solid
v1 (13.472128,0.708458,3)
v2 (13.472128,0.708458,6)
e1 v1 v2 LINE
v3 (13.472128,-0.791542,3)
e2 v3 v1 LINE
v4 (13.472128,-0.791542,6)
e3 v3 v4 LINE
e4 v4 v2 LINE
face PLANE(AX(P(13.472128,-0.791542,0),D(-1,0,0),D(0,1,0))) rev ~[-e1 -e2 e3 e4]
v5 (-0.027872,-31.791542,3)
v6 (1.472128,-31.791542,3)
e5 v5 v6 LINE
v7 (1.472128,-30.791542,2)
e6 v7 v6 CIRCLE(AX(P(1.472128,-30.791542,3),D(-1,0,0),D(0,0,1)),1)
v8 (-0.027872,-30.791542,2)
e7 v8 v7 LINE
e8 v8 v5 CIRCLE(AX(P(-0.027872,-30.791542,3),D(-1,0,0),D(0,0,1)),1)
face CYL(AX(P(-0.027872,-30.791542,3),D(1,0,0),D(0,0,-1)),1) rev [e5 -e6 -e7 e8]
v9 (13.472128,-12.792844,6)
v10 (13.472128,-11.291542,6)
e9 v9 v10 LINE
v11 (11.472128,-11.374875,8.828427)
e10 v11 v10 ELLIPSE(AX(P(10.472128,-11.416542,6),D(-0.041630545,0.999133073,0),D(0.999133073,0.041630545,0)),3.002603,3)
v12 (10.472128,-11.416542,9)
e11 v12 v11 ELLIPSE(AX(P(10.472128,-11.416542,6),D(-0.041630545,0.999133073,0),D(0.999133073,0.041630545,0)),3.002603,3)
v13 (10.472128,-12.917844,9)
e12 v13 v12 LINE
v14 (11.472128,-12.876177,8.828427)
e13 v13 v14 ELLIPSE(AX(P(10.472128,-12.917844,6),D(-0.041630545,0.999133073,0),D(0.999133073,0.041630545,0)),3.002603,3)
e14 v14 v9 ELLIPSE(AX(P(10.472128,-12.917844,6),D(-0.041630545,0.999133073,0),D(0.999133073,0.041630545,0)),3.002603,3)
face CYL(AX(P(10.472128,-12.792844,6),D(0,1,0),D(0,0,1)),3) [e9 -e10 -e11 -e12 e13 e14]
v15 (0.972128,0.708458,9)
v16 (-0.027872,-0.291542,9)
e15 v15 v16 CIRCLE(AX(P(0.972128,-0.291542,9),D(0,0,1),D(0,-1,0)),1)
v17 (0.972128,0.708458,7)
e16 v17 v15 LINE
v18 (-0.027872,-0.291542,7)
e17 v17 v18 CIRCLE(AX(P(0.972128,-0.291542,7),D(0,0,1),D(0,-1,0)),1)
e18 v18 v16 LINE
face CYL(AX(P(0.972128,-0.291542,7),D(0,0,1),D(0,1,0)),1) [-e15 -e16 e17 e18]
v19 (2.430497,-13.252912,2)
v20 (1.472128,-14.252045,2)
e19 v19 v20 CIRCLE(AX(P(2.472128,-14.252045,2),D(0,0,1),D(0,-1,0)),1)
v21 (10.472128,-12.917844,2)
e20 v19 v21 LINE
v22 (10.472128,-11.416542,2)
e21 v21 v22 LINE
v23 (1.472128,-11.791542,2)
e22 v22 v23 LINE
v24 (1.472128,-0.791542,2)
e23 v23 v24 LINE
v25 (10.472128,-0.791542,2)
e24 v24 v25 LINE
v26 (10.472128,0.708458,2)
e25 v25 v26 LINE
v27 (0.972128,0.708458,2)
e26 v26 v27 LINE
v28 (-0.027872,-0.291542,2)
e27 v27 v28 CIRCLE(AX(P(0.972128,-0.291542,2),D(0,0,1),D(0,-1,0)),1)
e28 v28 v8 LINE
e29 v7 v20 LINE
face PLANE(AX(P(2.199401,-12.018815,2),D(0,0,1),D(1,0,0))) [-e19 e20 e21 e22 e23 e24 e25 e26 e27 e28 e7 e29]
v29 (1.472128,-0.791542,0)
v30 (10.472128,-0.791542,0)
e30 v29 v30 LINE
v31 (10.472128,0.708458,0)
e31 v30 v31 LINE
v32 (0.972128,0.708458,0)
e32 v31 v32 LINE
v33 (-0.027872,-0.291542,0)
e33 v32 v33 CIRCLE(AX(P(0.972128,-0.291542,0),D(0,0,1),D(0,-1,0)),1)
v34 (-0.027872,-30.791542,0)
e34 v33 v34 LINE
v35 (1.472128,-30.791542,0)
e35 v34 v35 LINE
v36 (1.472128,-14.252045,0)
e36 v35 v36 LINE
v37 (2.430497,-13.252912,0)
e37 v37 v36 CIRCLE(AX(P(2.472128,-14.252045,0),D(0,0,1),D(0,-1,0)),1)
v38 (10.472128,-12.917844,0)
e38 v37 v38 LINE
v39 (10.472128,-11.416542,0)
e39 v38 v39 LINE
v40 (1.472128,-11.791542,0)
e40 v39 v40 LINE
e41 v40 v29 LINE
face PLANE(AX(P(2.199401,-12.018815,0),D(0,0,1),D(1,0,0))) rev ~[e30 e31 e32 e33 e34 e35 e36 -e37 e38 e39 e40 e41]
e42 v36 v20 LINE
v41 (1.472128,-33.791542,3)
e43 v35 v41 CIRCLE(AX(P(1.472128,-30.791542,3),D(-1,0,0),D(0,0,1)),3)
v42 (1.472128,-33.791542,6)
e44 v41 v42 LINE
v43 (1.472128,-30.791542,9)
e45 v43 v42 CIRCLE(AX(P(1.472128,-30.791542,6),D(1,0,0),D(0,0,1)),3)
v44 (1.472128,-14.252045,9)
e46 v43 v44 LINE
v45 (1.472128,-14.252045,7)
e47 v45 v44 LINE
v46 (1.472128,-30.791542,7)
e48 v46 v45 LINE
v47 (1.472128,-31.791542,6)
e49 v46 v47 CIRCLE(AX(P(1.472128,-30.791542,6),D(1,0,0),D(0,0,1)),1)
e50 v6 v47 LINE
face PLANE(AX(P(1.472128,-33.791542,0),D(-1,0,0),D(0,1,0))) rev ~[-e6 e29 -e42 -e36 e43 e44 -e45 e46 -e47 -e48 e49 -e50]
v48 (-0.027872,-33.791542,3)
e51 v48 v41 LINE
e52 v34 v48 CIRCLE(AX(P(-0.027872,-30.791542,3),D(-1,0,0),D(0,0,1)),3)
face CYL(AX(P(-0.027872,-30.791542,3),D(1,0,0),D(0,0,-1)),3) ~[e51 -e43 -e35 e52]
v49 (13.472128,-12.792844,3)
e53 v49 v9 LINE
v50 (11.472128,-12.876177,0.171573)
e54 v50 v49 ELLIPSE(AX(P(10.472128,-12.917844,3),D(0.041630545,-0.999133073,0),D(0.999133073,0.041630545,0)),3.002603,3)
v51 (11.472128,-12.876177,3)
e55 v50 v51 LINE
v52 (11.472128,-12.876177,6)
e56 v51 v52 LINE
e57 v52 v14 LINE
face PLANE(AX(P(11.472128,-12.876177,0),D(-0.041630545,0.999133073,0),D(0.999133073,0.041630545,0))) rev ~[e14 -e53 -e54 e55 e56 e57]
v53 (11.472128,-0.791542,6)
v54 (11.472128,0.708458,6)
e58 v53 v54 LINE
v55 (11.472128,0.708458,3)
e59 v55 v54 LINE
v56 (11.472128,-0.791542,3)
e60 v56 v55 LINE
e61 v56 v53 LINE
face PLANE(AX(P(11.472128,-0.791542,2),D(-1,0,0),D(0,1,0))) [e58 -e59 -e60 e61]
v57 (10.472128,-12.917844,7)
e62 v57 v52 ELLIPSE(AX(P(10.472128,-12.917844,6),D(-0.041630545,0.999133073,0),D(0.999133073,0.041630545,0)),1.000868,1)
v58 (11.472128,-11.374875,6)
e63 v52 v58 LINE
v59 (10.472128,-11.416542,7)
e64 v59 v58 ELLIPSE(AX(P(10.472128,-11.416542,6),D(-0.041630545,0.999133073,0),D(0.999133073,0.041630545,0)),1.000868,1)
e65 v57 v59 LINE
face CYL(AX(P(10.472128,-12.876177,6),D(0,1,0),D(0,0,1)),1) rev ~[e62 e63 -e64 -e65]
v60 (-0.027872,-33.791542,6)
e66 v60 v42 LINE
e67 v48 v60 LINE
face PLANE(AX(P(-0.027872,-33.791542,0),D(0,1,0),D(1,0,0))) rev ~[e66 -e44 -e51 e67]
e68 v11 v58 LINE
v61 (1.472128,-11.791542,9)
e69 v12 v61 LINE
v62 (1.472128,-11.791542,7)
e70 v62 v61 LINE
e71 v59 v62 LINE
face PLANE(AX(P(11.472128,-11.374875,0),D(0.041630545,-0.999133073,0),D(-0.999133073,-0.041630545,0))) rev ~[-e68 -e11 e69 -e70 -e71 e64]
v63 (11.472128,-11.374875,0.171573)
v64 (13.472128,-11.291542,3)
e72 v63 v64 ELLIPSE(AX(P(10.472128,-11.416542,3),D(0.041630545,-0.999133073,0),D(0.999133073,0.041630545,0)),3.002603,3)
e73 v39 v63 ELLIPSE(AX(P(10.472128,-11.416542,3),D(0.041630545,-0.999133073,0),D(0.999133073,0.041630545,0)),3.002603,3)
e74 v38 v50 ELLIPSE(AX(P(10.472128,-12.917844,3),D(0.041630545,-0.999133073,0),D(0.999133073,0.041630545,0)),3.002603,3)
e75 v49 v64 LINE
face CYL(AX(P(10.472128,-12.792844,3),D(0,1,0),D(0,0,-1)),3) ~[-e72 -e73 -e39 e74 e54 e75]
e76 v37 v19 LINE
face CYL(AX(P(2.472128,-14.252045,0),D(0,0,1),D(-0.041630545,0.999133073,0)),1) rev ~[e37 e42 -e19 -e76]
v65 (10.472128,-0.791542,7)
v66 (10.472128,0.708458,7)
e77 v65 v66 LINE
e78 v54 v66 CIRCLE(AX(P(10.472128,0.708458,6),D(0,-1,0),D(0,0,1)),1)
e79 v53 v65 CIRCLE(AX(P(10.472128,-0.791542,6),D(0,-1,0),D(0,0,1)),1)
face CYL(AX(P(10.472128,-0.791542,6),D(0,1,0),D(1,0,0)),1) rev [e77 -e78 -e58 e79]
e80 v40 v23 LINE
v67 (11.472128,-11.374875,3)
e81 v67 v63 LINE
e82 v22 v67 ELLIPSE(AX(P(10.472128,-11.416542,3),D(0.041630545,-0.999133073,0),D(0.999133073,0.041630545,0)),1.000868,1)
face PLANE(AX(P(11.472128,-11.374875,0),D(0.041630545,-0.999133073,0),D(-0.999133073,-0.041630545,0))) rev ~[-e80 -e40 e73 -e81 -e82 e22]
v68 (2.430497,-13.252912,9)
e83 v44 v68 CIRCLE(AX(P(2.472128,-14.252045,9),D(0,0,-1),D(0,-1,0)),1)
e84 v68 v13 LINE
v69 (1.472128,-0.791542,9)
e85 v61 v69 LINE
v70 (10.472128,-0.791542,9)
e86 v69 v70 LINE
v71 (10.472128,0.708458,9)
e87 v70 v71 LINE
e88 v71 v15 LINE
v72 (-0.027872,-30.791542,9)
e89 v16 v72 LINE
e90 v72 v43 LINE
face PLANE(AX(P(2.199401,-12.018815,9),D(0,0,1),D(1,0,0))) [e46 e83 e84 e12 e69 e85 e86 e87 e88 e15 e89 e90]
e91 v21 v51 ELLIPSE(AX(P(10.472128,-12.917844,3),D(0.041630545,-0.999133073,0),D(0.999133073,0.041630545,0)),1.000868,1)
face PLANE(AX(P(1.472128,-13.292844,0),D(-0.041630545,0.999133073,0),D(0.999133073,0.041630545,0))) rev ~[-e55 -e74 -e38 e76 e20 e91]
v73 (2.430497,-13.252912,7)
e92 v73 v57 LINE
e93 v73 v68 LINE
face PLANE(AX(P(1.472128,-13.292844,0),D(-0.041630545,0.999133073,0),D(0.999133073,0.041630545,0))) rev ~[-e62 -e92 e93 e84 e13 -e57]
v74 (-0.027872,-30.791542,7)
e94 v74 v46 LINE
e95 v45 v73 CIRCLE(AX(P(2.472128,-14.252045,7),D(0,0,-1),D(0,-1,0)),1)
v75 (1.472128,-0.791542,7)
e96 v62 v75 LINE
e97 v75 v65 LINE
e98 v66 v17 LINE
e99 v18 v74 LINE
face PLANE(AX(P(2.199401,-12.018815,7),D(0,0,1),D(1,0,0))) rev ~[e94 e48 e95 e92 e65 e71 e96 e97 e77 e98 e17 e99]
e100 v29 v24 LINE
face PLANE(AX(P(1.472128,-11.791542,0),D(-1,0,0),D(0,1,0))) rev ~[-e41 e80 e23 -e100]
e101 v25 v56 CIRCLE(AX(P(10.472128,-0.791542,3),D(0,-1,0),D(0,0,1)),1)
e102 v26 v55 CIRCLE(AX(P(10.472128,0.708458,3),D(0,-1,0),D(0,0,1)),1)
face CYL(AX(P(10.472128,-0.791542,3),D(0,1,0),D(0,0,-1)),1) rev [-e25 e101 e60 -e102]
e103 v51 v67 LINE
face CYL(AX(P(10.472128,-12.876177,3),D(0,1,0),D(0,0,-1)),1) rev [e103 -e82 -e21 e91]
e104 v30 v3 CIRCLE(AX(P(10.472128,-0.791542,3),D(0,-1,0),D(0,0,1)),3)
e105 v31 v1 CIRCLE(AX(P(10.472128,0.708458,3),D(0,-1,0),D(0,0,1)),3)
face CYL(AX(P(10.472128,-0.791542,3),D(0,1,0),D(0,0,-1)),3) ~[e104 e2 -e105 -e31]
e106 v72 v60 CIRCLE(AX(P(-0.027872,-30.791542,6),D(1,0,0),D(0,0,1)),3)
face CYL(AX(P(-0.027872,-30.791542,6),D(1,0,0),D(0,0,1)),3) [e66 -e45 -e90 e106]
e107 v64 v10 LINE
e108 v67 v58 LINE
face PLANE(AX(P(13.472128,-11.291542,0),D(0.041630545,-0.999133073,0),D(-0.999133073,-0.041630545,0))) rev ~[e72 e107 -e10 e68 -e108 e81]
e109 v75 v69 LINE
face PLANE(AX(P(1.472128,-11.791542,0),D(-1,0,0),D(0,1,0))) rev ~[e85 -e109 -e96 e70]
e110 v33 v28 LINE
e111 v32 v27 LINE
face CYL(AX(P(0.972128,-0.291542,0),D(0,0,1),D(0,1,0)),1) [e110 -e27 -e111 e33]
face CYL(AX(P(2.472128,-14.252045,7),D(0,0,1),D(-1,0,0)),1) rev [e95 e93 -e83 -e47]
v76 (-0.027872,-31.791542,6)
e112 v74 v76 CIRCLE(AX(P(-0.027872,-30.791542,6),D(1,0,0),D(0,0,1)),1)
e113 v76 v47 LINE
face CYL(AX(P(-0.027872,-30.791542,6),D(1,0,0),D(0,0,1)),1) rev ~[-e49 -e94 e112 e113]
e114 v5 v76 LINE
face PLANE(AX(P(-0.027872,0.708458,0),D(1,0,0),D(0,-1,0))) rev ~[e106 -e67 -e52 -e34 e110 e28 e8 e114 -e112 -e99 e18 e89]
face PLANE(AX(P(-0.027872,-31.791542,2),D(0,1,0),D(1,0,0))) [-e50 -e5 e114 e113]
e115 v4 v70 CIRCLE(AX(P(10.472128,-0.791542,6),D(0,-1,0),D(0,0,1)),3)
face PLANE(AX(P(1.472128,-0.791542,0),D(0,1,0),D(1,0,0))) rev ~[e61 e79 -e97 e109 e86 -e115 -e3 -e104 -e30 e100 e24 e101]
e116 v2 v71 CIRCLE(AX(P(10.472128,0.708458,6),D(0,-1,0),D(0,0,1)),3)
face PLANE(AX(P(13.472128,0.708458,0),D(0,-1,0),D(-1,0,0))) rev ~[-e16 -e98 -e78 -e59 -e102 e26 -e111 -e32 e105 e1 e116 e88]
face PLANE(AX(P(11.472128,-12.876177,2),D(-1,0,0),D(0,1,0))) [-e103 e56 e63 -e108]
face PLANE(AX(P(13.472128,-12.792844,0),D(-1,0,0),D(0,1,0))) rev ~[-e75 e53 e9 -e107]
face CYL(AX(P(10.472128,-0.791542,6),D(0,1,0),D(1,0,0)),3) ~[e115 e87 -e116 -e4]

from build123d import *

# Parameters (mm, degrees)
F1_DEPTH      = 2.5
F1_DEPTH_BACK = 2.5
F2_SIZE2      = 1
F2_SIZE       = 2
F3_R          = 3
F4_START      = 4
F4_DEPTH      = 5
F5_R          = 5
F5_2_R        = 5
F6_R          = 2
F6_2_R        = 2
F7_W          = 2.5
F7_H          = 2.5
F8_ANGLE      = 90
F9_DEPTH      = 10
F11_DEPTH     = 8
F12_DEPTH     = 8
F15_START     = 2.5
F14_R         = 2.5
F15_DEPTH     = 1.5
F16_W         = 12
F16_H         = 2
F16_W_2       = 2
F16_H_2       = 20
F17_DEPTH     = 7
F18_T         = -1
F16_H_3       = 1.5
F16_W_3       = 1.5
F19_DEPTH     = 9
F20_START     = 2
F20_DEPTH     = 5
F21_R         = 3
F21_2_R       = 3
F22_T1_DEPTH  = 2
F22_T3_DEPTH  = 1
F22_T5_DEPTH  = 1
F22_T7_DEPTH  = 2
F22_T9_DEPTH  = 2
F22_T11_DEPTH = 11
F22_T13_DEPTH = 32
F22_S17_W     = 1.02
F22_S17_H     = 1.02
F22_T18_DEPTH = 1.02
F22_S23_W     = 1.02
F22_S23_H     = 1.02
F22_T24_DEPTH = 1.02
F22_T28_ANGLE = 233.2969892374
F22_T30_ANGLE = 233.2969892374
F22_T32_ANGLE = 233.2969892374
F22_T34_ANGLE = 233.2969892374
F22_T35_DEPTH = 9
F22_T37_DEPTH = 9
F22_T39_DEPTH = 17
F22_T42_ANGLE = 233.2969892374
F22_T44_ANGLE = 90
F22_T46_ANGLE = 233.2969892374
F22_T48_ANGLE = 90
F22_T50_ANGLE = 90
F22_T52_ANGLE = 233.2969892374
F22_T54_ANGLE = 233.2969892374
F22_T56_ANGLE = 90
F22_T58_ANGLE = 233.2969892374
F22_T60_ANGLE = 233.2969892374
F22_T62_ANGLE = 90
F22_T64_ANGLE = 233.2969892374
F22_T66_ANGLE = 90
F22_T68_ANGLE = 233.2969892374
F22_2_F1_R    = 1
F22_2_F2_R    = 1


# Not quite as in the source:
# - a fillet or chamfer that OpenCascade refuses, or shapes differently, is made with other operations: its cross-section is extruded or revolved along the edge and cut away or added
# - a feature names something its author has since deleted; it is built from what else it names


with BuildPart() as f1:
    # F0 (on Top) → F1 (new body, two sides)
    with BuildSketch(Plane.XY) as f1_sk:
        Polygon((-2.4175545031, 19.9997189244), (-63.6058346017, 10), (-71.3429901912, 55.5274909482), (-73.2526121256, 67.2124675644), (-87.2356820635, 67.2124675644), (-132.104240014, 0), (-120.0807613656, 0), (-81.7352983314, 57.4409632971), (-81.1490054203, 53.9442313206), (-72.104240014, 0), (-63.6058346017, 0), (-0.7575159774, 9.8419431859), (0.8509074882, 0), (10.9835668635, 0), (4.4465969461, 39.9997189244), (-5.6860624292, 39.9997189244), align=None)
    extrude(amount=F1_DEPTH)
    extrude(f1_sk.sketch, amount=-F1_DEPTH_BACK)

    # F2
    f2_edges = [f1.edges().sort_by_distance(p)[0] for p in [
        (-80.244147, 67.212468, 2.5),
    ]]
    f2_side = f1.faces().sort_by_distance((-80.244147, 67.212468, 0))[0]
    chamfer(f2_edges, length=F2_SIZE, length2=F2_SIZE2, reference=f2_side)

    # F3
    f3_edges = [f1.edges().sort_by_distance(p)[0] for p in [
        (-80.496216, 66.212468, 2.5),
    ]]
    fillet(f3_edges, radius=F3_R)

    # F5
    f5_edges = [f1.edges().sort_by_distance(p)[0] for p in [
        (-81.735298, 57.440963, 0),
        (-72.10424, 0, 0),
        (-120.080761, 0, 0),
        (0.850907, 0, 0),
        (-87.235682, 67.212468, -1),
        (-73.252612, 67.212468, -1),
        (4.446597, 39.999719, 0),
    ]]
    fillet(f5_edges, radius=F5_R)

    # F6
    f6_edges = [f1.edges().sort_by_distance(p)[0] for p in [
        (-2.417555, 19.999719, 0),
        (-63.605835, 10, 0),
        (-0.757516, 9.841943, 0),
        (-5.686062, 39.999719, 0),
        (10.983567, 0, 0),
        (-132.10424, 0, 0),
    ]]
    fillet(f6_edges, radius=F6_R)

    # F7 (on Top) → F8 (revolve, cut)
    with BuildSketch(Plane.XY):
        Polygon((-82.9107738397, 68.988720722), (-82.9107738397, 65.988720722), (-82.0857738397, 65.988720722), (-79.9107738397, 65.988720722), (-77.7357738397, 65.988720722), (-76.9107738397, 65.988720722), (-76.9107738397, 68.988720722), align=None)
        Polygon((-82.4107738397, 65.488720722), (-79.9107738397, 65.488720722), (-77.4107738397, 65.488720722), (-76.9107738397, 65.1856904189), (-76.9107738397, 65.488720722), (-77.7357738397, 65.988720722), (-79.9107738397, 65.988720722), (-82.0857738397, 65.988720722), (-82.9107738397, 65.488720722), (-82.9107738397, 65.1856904189), align=None)
        Polygon((-82.9107738397, 65.988720722), (-82.9107738397, 65.488720722), (-82.0857738397, 65.988720722), align=None)
        Polygon((-77.7357738397, 65.988720722), (-76.9107738397, 65.488720722), (-76.9107738397, 65.988720722), align=None)
        Polygon((-82.9107738397, 65.1856904189), (-82.9107738397, 62.988720722), (-82.4107738397, 62.988720722), (-82.4107738397, 65.488720722), align=None)
        with Locations((-81.1607738397, 64.238720722)):
            Rectangle(F7_W, F7_H)
        with Locations((-78.6607738397, 64.238720722)):
            Rectangle(F7_W, F7_H)
        Polygon((-77.4107738397, 62.988720722), (-76.9107738397, 62.988720722), (-76.9107738397, 65.1856904189), (-77.4107738397, 65.488720722), align=None)
    revolve(axis=Axis((-79.9107738397, 62.988720722, 0), (-1, 0, 0)), revolution_arc=F8_ANGLE, mode=Mode.SUBTRACT)


with BuildPart() as f4:
    # F0 (on Top) → F4 (new body)
    with BuildSketch(Plane.XY.offset(F4_START)):
        Polygon((-2.4175545031, 19.9997189244), (-63.6058346017, 10), (-71.3429901912, 55.5274909482), (-73.2526121256, 67.2124675644), (-87.2356820635, 67.2124675644), (-132.104240014, 0), (-120.0807613656, 0), (-81.7352983314, 57.4409632971), (-81.1490054203, 53.9442313206), (-72.104240014, 0), (-63.6058346017, 0), (-0.7575159774, 9.8419431859), (0.8509074882, 0), (10.9835668635, 0), (4.4465969461, 39.9997189244), (-5.6860624292, 39.9997189244), align=None)
    extrude(amount=F4_DEPTH)

    # F5#2
    f5_2_edges = [f4.edges().sort_by_distance(p)[0] for p in [
        (-81.735298, 57.440963, 6.5),
        (-72.10424, 0, 6.5),
        (-120.080761, 0, 6.5),
        (0.850907, 0, 6.5),
        (-87.235682, 67.212468, 6.5),
        (-73.252612, 67.212468, 6.5),
        (4.446597, 39.999719, 6.5),
    ]]
    fillet(f5_2_edges, radius=F5_2_R)

    # F6#2
    f6_2_edges = [f4.edges().sort_by_distance(p)[0] for p in [
        (-2.417555, 19.999719, 6.5),
        (-63.605835, 10, 6.5),
        (-0.757516, 9.841943, 6.5),
        (-5.686062, 39.999719, 6.5),
        (10.983567, 0, 6.5),
        (-132.10424, 0, 6.5),
    ]]
    fillet(f6_2_edges, radius=F6_2_R)


with BuildPart() as f9_tool:
    # F7 (on Top) → F9 (new body)
    with BuildSketch(Plane.XY):
        Polygon((-82.9107738397, 68.988720722), (-82.9107738397, 65.988720722), (-82.0857738397, 65.988720722), (-79.9107738397, 65.988720722), (-77.7357738397, 65.988720722), (-76.9107738397, 65.988720722), (-76.9107738397, 68.988720722), align=None)
        Polygon((-82.9107738397, 65.988720722), (-82.9107738397, 65.488720722), (-82.0857738397, 65.988720722), align=None)
        Polygon((-77.7357738397, 65.988720722), (-76.9107738397, 65.488720722), (-76.9107738397, 65.988720722), align=None)
        Polygon((-82.4107738397, 65.488720722), (-79.9107738397, 65.488720722), (-77.4107738397, 65.488720722), (-76.9107738397, 65.1856904189), (-76.9107738397, 65.488720722), (-77.7357738397, 65.988720722), (-79.9107738397, 65.988720722), (-82.0857738397, 65.988720722), (-82.9107738397, 65.488720722), (-82.9107738397, 65.1856904189), align=None)
        Polygon((-82.9107738397, 65.1856904189), (-82.9107738397, 62.988720722), (-82.4107738397, 62.988720722), (-82.4107738397, 65.488720722), align=None)
        with Locations((-81.1607738397, 64.238720722)):
            Rectangle(F7_W, F7_H)
        with Locations((-78.6607738397, 64.238720722)):
            Rectangle(F7_W, F7_H)
        Polygon((-77.4107738397, 62.988720722), (-76.9107738397, 62.988720722), (-76.9107738397, 65.1856904189), (-77.4107738397, 65.488720722), align=None)
        Polygon((-82.9107738397, 59.988720722), (-79.9107738397, 59.988720722), (-79.9107738397, 60.488720722), (-82.4107738397, 60.488720722), (-82.4107738397, 62.988720722), (-82.9107738397, 62.988720722), align=None)
        with Locations((-81.1607738397, 61.738720722)):
            Rectangle(F7_W, F7_H)
        with Locations((-78.6607738397, 61.738720722)):
            Rectangle(F7_W, F7_H)
        Polygon((-79.9107738397, 60.488720722), (-79.9107738397, 59.988720722), (-76.9107738397, 59.988720722), (-76.9107738397, 62.988720722), (-77.4107738397, 62.988720722), (-77.4107738397, 60.488720722), align=None)
    extrude(amount=F9_DEPTH)


with BuildPart() as f1_1:
    add(f1.part)

    # F9: cut by f9_tool
    add(f9_tool.part, mode=Mode.SUBTRACT)

    # F7 (on Top) → F10 (revolve, cut)
    with BuildSketch(Plane.XY):
        Polygon((-85.7107738397, 63.488720722), (-82.9107738397, 65.1856904189), (-82.9107738397, 65.488720722), (-86.2107738397, 63.488720722), (-86.2107738397, 62.988720722), (-85.7107738397, 62.988720722), align=None)
        Polygon((-85.7107738397, 62.988720722), (-82.9107738397, 62.988720722), (-82.9107738397, 65.1856904189), (-85.7107738397, 63.488720722), align=None)
        Polygon((-82.4107738397, 65.488720722), (-79.9107738397, 65.488720722), (-77.4107738397, 65.488720722), (-76.9107738397, 65.1856904189), (-76.9107738397, 65.488720722), (-77.7357738397, 65.988720722), (-79.9107738397, 65.988720722), (-82.0857738397, 65.988720722), (-82.9107738397, 65.488720722), (-82.9107738397, 65.1856904189), align=None)
        Polygon((-82.9107738397, 65.1856904189), (-82.9107738397, 62.988720722), (-82.4107738397, 62.988720722), (-82.4107738397, 65.488720722), align=None)
        with Locations((-81.1607738397, 64.238720722)):
            Rectangle(F7_W, F7_H)
        with Locations((-78.6607738397, 64.238720722)):
            Rectangle(F7_W, F7_H)
        Polygon((-77.4107738397, 62.988720722), (-76.9107738397, 62.988720722), (-76.9107738397, 65.1856904189), (-77.4107738397, 65.488720722), align=None)
        Polygon((-76.9107738397, 65.1856904189), (-76.9107738397, 62.988720722), (-74.1107738397, 62.988720722), (-74.1107738397, 63.488720722), align=None)
        Polygon((-76.9107738397, 65.488720722), (-76.9107738397, 65.1856904189), (-74.1107738397, 63.488720722), (-74.1107738397, 62.988720722), (-73.6107738397, 62.988720722), (-73.6107738397, 63.488720722), align=None)
    revolve(axis=Axis((-75.7607738397, 62.988720722, 0), (1, 0, 0)), mode=Mode.SUBTRACT)

    # F7 (on Top) → F11 (cut)
    with BuildSketch(Plane.XY):
        with Locations((-78.6607738397, 64.238720722)):
            Rectangle(F7_W, F7_H)
        with Locations((-81.1607738397, 64.238720722)):
            Rectangle(F7_W, F7_H)
        with Locations((-78.6607738397, 61.738720722)):
            Rectangle(F7_W, F7_H)
        with Locations((-81.1607738397, 61.738720722)):
            Rectangle(F7_W, F7_H)
    extrude(amount=F11_DEPTH, mode=Mode.SUBTRACT)



with BuildPart() as f4_1:
    add(f4.part)

    # F9: cut by f9_tool
    add(f9_tool.part, mode=Mode.SUBTRACT)


with BuildPart() as f12:
    # F7 (on Top) → F12 (new body)
    with BuildSketch(Plane.XY):
        with Locations((-81.1607738397, 64.238720722)):
            Rectangle(F7_W, F7_H)
        with Locations((-78.6607738397, 64.238720722)):
            Rectangle(F7_W, F7_H)
        with Locations((-81.1607738397, 61.738720722)):
            Rectangle(F7_W, F7_H)
        with Locations((-78.6607738397, 61.738720722)):
            Rectangle(F7_W, F7_H)
    extrude(amount=F12_DEPTH)

    # F7 (on Top) → F13 (revolve)
    with BuildSketch(Plane.XY):
        Polygon((-85.7107738397, 62.988720722), (-82.9107738397, 62.988720722), (-82.9107738397, 65.1856904189), (-85.7107738397, 63.488720722), align=None)
        Polygon((-82.9107738397, 65.1856904189), (-82.9107738397, 62.988720722), (-82.4107738397, 62.988720722), (-82.4107738397, 65.488720722), align=None)
        with Locations((-81.1607738397, 64.238720722)):
            Rectangle(F7_W, F7_H)
        with Locations((-78.6607738397, 64.238720722)):
            Rectangle(F7_W, F7_H)
        Polygon((-77.4107738397, 62.988720722), (-76.9107738397, 62.988720722), (-76.9107738397, 65.1856904189), (-77.4107738397, 65.488720722), align=None)
        Polygon((-76.9107738397, 65.1856904189), (-76.9107738397, 62.988720722), (-74.1107738397, 62.988720722), (-74.1107738397, 63.488720722), align=None)
    revolve(axis=Axis((-79.9107738397, 62.988720722, 0), (1, 0, 0)))


with BuildPart() as f1_2:
    add(f1_1.part)

    add(f4_1.part)  # F15 merges F4
    # F14 (on Top) → F15 (join)
    with BuildSketch(Plane.XY.offset(F15_START)):
        with Locations((5.1001101943, 5)):
            Circle(F14_R)
        with Locations((0.6434008568, 34.9997189244)):
            Circle(F14_R)
        with Locations((-122.7546855807, 5)):
            Circle(F14_R)
        with Locations((-67.8727891486, 5)):
            Circle(F14_R)
        with Locations((-81.4505400433, 54.6900098794)):
            Circle(F14_R)
    extrude(amount=F15_DEPTH)


with BuildPart() as f17:
    # F16 (on Top) → F17 (new body)
    with BuildSketch(Plane.XY):
        Polygon((-30.1369051993, -11.2915403917), (-30.1369051993, -0.2915403917), (-18.1369051993, -0.2915403917), (-18.1369051993, 1.7084596083), (-32.1369051993, 1.7084596083), (-32.1369051993, -13.2915403917), (-30.1369051993, -13.2915403917), align=None)
        with Locations((-24.1369051993, -12.2915403917)):
            Rectangle(F16_W, F16_H)
        with Locations((-31.1369051993, -23.2915403917)):
            Rectangle(F16_W_2, F16_H_2)
    extrude(amount=F17_DEPTH)

    # F18
    f18_openings = [f17.faces().sort_by_distance(p)[0] for p in [
        (-30.136905, -23.29154, 3.5),
        (-30.136905, -5.79154, 3.5),
        (-24.136905, -13.29154, 3.5),
        (-24.136905, -0.29154, 3.5),
        (-24.136905, -11.29154, 3.5),
        (-25.136905, 1.70846, 3.5),
        (-32.136905, -15.79154, 3.5),
    ]]
    offset(amount=F18_T, openings=f18_openings)

    # F21
    f21_edges = [f17.edges().sort_by_distance(p)[0] for p in [
        (-31.136905, -33.29154, 7),
        (-31.136905, -33.29154, 0),
        (-18.136905, -12.29154, 0),
        (-18.136905, -12.29154, 7),
        (-18.136905, 0.70846, 7),
        (-18.136905, 0.70846, 0),
    ]]
    fillet(f21_edges, radius=F21_R)

    # F22: fillet of radius 1 on 28 edges, made by hand

    # F22_s2 → F22_t1 (join)
    with BuildSketch(Plane.YZ.offset(-32.1369051993)):
        with BuildLine():
            ThreePointArc((-31.2915403917, 1), (-31.9986471729, 1.2928932188), (-32.2915403917, 2))
            Line((-32.2915403917, 2), (-32.3115403917, 2))
            Line((-32.3115403917, 2), (-32.3115403917, 0.98))
            Line((-32.3115403917, 0.98), (-31.2915403917, 0.98))
            Line((-31.2915403917, 0.98), (-31.2915403917, 1))
        make_face()
        with BuildLine():
            ThreePointArc((-31.2915403917, 6), (-31.9986471729, 5.7071067812), (-32.2915403917, 5))
            Line((-32.2915403917, 5), (-32.3115403917, 5))
            Line((-32.3115403917, 5), (-32.3115403917, 6.02))
            Line((-32.3115403917, 6.02), (-31.2915403917, 6.02))
            Line((-31.2915403917, 6.02), (-31.2915403917, 6))
        make_face()
    extrude(amount=F22_T1_DEPTH)

    # F22_s4 → F22_t3 (join)
    with BuildSketch(Plane.XY):
        with BuildLine():
            ThreePointArc((-29.1369051993, -0.2915403917), (-29.8440119805, -0.5844336106), (-30.1369051993, -1.2915403917))
            Line((-30.1369051993, -1.2915403917), (-30.1569051993, -1.2915403917))
            Line((-30.1569051993, -1.2915403917), (-30.1569051993, -0.2715403917))
            Line((-30.1569051993, -0.2715403917), (-29.1369051993, -0.2715403917))
            Line((-29.1369051993, -0.2715403917), (-29.1369051993, -0.2915403917))
        make_face()
        with BuildLine():
            ThreePointArc((-29.1369051993, -13.2915403917), (-29.8440119805, -13.5844336106), (-30.1369051993, -14.2915403917))
            Line((-30.1369051993, -14.2915403917), (-30.1569051993, -14.2915403917))
            Line((-30.1569051993, -14.2915403917), (-30.1569051993, -13.2715403917))
            Line((-30.1569051993, -13.2715403917), (-29.1369051993, -13.2715403917))
            Line((-29.1369051993, -13.2715403917), (-29.1369051993, -13.2915403917))
        make_face()
        with BuildLine():
            ThreePointArc((-30.1369051993, -10.2915403917), (-29.8440119805, -10.9986471729), (-29.1369051993, -11.2915403917))
            Line((-29.1369051993, -11.2915403917), (-29.1369051993, -11.3115403917))
            Line((-29.1369051993, -11.3115403917), (-30.1569051993, -11.3115403917))
            Line((-30.1569051993, -11.3115403917), (-30.1569051993, -10.2915403917))
            Line((-30.1569051993, -10.2915403917), (-30.1369051993, -10.2915403917))
        make_face()
    extrude(amount=F22_T3_DEPTH)

    # F22_s6 → F22_t5 (join)
    with BuildSketch(Plane.XY.offset(6)):
        with BuildLine():
            ThreePointArc((-29.1369051993, -0.2915403917), (-29.8440119805, -0.5844336106), (-30.1369051993, -1.2915403917))
            Line((-30.1369051993, -1.2915403917), (-30.1569051993, -1.2915403917))
            Line((-30.1569051993, -1.2915403917), (-30.1569051993, -0.2715403917))
            Line((-30.1569051993, -0.2715403917), (-29.1369051993, -0.2715403917))
            Line((-29.1369051993, -0.2715403917), (-29.1369051993, -0.2915403917))
        make_face()
        with BuildLine():
            ThreePointArc((-29.1369051993, -13.2915403917), (-29.8440119805, -13.5844336106), (-30.1369051993, -14.2915403917))
            Line((-30.1369051993, -14.2915403917), (-30.1569051993, -14.2915403917))
            Line((-30.1569051993, -14.2915403917), (-30.1569051993, -13.2715403917))
            Line((-30.1569051993, -13.2715403917), (-29.1369051993, -13.2715403917))
            Line((-29.1369051993, -13.2715403917), (-29.1369051993, -13.2915403917))
        make_face()
        with BuildLine():
            ThreePointArc((-30.1369051993, -10.2915403917), (-29.8440119805, -10.9986471729), (-29.1369051993, -11.2915403917))
            Line((-29.1369051993, -11.2915403917), (-29.1369051993, -11.3115403917))
            Line((-29.1369051993, -11.3115403917), (-30.1569051993, -11.3115403917))
            Line((-30.1569051993, -11.3115403917), (-30.1569051993, -10.2915403917))
            Line((-30.1569051993, -10.2915403917), (-30.1369051993, -10.2915403917))
        make_face()
    extrude(amount=F22_T5_DEPTH)

    # F22_s8 → F22_t7 (join)
    with BuildSketch(Plane.XZ.offset(-1.7084596083)):
        with BuildLine():
            ThreePointArc((-20.1369051993, 1), (-19.4297984181, 1.2928932188), (-19.1369051993, 2))
            Line((-19.1369051993, 2), (-19.1169051993, 2))
            Line((-19.1169051993, 2), (-19.1169051993, 0.98))
            Line((-19.1169051993, 0.98), (-20.1369051993, 0.98))
            Line((-20.1369051993, 0.98), (-20.1369051993, 1))
        make_face()
        with BuildLine():
            ThreePointArc((-20.1369051993, 6), (-19.4297984181, 5.7071067812), (-19.1369051993, 5))
            Line((-19.1369051993, 5), (-19.1169051993, 5))
            Line((-19.1169051993, 5), (-19.1169051993, 6.02))
            Line((-19.1169051993, 6.02), (-20.1369051993, 6.02))
            Line((-20.1369051993, 6.02), (-20.1369051993, 6))
        make_face()
    extrude(amount=F22_T7_DEPTH)

    # F22_s10 → F22_t9 (join)
    with BuildSketch(Plane.XZ.offset(11.2915403917)):
        with BuildLine():
            ThreePointArc((-20.1369051993, 1), (-19.4297984181, 1.2928932188), (-19.1369051993, 2))
            Line((-19.1369051993, 2), (-19.1169051993, 2))
            Line((-19.1169051993, 2), (-19.1169051993, 0.98))
            Line((-19.1169051993, 0.98), (-20.1369051993, 0.98))
            Line((-20.1369051993, 0.98), (-20.1369051993, 1))
        make_face()
        with BuildLine():
            ThreePointArc((-20.1369051993, 6), (-19.4297984181, 5.7071067812), (-19.1369051993, 5))
            Line((-19.1369051993, 5), (-19.1169051993, 5))
            Line((-19.1169051993, 5), (-19.1169051993, 6.02))
            Line((-19.1169051993, 6.02), (-20.1369051993, 6.02))
            Line((-20.1369051993, 6.02), (-20.1369051993, 6))
        make_face()
    extrude(amount=F22_T9_DEPTH)

    # F22_s12 → F22_t11 (cut)
    with BuildSketch(Plane.YZ.offset(-31.1369051993)):
        with BuildLine():
            ThreePointArc((1.7084596083, 0), (1.4155663894, 0.7071067812), (0.7084596083, 1))
            Line((0.7084596083, 1), (0.7084596083, 1.02))
            Line((0.7084596083, 1.02), (1.7284596083, 1.02))
            Line((1.7284596083, 1.02), (1.7284596083, 0))
            Line((1.7284596083, 0), (1.7084596083, 0))
        make_face()
        with BuildLine():
            ThreePointArc((1.7084596083, 7), (1.4155663894, 6.2928932188), (0.7084596083, 6))
            Line((0.7084596083, 6), (0.7084596083, 5.98))
            Line((0.7084596083, 5.98), (1.7284596083, 5.98))
            Line((1.7284596083, 5.98), (1.7284596083, 7))
            Line((1.7284596083, 7), (1.7084596083, 7))
        make_face()
    extrude(amount=F22_T11_DEPTH, mode=Mode.SUBTRACT)

    # F22_s14 → F22_t13 (cut)
    with BuildSketch(Plane.XZ.offset(-0.7084596083)):
        with BuildLine():
            ThreePointArc((-31.1369051993, 1), (-31.8440119805, 0.7071067812), (-32.1369051993, 0))
            Line((-32.1369051993, 0), (-32.1569051993, 0))
            Line((-32.1569051993, 0), (-32.1569051993, 1.02))
            Line((-32.1569051993, 1.02), (-31.1369051993, 1.02))
            Line((-31.1369051993, 1.02), (-31.1369051993, 1))
        make_face()
        with BuildLine():
            ThreePointArc((-31.1369051993, 6), (-31.8440119805, 6.2928932188), (-32.1369051993, 7))
            Line((-32.1369051993, 7), (-32.1569051993, 7))
            Line((-32.1569051993, 7), (-32.1569051993, 5.98))
            Line((-32.1569051993, 5.98), (-31.1369051993, 5.98))
            Line((-31.1369051993, 5.98), (-31.1369051993, 6))
        make_face()
    extrude(amount=F22_T13_DEPTH, mode=Mode.SUBTRACT)


with BuildPart() as f19:
    # F16 (on Top) → F19 (new body)
    with BuildSketch(Plane.XY):
        Polygon((1.4721279692, -11.7915420532), (1.4721279692, -0.7915420532), (11.4721279692, -0.7915420532), (11.4721279692, 0.7084579468), (-0.0278720308, 0.7084579468), (-0.0278720308, -31.7915420532), (1.4721279692, -31.7915420532), (1.4721279692, -13.2928435719), align=None)
        with Locations((12.4721279692, -0.0415420532)):
            Rectangle(F16_W_2, F16_H_3)
        with Locations((0.7221279692, -32.7915420532)):
            Rectangle(F16_W_3, F16_H)
        Polygon((11.4721279692, -11.3748753866), (1.4721279692, -11.7915420532), (1.4721279692, -13.2928435719), (11.4721279692, -12.8761769052), align=None)
        Polygon((13.4721279692, -11.2915420532), (11.4721279692, -11.3748753866), (11.4721279692, -12.8761769052), (13.4721279692, -12.7928435719), (13.4721279692, -11.7915420532), align=None)
    extrude(amount=F19_DEPTH)


with BuildPart() as f20_tool:
    # F16 (on Top) → F20 (new body)
    with BuildSketch(Plane.XY.offset(F20_START)):
        Polygon((1.4721279692, -11.7915420532), (1.4721279692, -0.7915420532), (11.4721279692, -0.7915420532), (11.4721279692, 0.7084579468), (-0.0278720308, 0.7084579468), (-0.0278720308, -31.7915420532), (1.4721279692, -31.7915420532), (1.4721279692, -13.2928435719), align=None)
        Polygon((11.4721279692, -11.3748753866), (1.4721279692, -11.7915420532), (1.4721279692, -13.2928435719), (11.4721279692, -12.8761769052), align=None)
    extrude(amount=F20_DEPTH)


with BuildPart() as f1_3:
    add(f1_2.part)

    # F20: cut by f20_tool
    add(f20_tool.part, mode=Mode.SUBTRACT)


with BuildPart() as f19_1:
    add(f19.part)

    # F20: cut by f20_tool
    add(f20_tool.part, mode=Mode.SUBTRACT)

    # F21#2
    f21_2_edges = [f19_1.edges().sort_by_distance(p)[0] for p in [
        (0.722128, -33.791542, 9),
        (0.722128, -33.791542, 0),
        (13.472128, -12.042193, 9),
        (13.472128, -0.041542, 9),
        (13.472128, -0.041542, 0),
        (13.472128, -12.042193, 0),
    ]]
    fillet(f21_2_edges, radius=F21_2_R)

    # F22#2: fillet of radius 1 on 10 edges, made by hand

    # F22_2_f1
    f22_2_f1_edges = [f19_1.edges().sort_by_distance(p)[0] for p in [
        (0.7221279692, -31.7915420532, 2),
        (0.7221279692, -31.7915420532, 7),
        (11.4721279692, -0.0415420532, 2),
        (11.4721279692, -0.0415420532, 7),
        (11.4721279692, -12.1255261459, 2),
        (11.4721279692, -12.1255261459, 7),
        (1.4721279692, -13.2928435719, 1),
        (1.4721279692, -13.2928435719, 8),
    ]]
    fillet(f22_2_f1_edges, radius=F22_2_F1_R)

    # F22_2_f2
    f22_2_f2_edges = [f19_1.edges().sort_by_distance(p)[0] for p in [
        (-0.0278720308, 0.7084579468, 1),
        (-0.0278720308, 0.7084579468, 8),
    ]]
    fillet(f22_2_f2_edges, radius=F22_2_F2_R)


with BuildPart() as f22_tool16:
    # F22_s17 → F22_t18 (new body)
    with BuildSketch(Plane.XY):
        with Locations((-31.6469051993, 1.2184596083)):
            Rectangle(F22_S17_W, F22_S17_H)
    extrude(amount=F22_T18_DEPTH)

    # F22_s19 → F22_t20 (revolve, cut)
    with BuildSketch(Plane(origin=(-31.1369051993, 0.7084596083, 0), x_dir=(0.7071067812, -0.7071067812, 0), z_dir=(-0.7071067812, -0.7071067812, 0))):
        with BuildLine():
            ThreePointArc((0, -1), (1, 0), (0, 1))
            Line((0, 1), (0, -1))
        make_face()
    revolve(axis=Axis((-31.1369051993, 0.7084596083, 0), (0, 0, 1)), mode=Mode.SUBTRACT)


with BuildPart() as f17_1:
    add(f17.part)

    # F22_t15: cut F22_tool16
    add(f22_tool16.part, mode=Mode.SUBTRACT)


with BuildPart() as f22_tool22:
    # F22_s23 → F22_t24 (new body)
    with BuildSketch(Plane.XZ.offset(-0.7084596083)):
        with Locations((-31.6469051993, 6.49)):
            Rectangle(F22_S23_W, F22_S23_H)
    extrude(amount=-F22_T24_DEPTH)

    # F22_s25 → F22_t26 (revolve, cut)
    with BuildSketch(Plane(origin=(-31.1369051993, 0.7084596083, 7), x_dir=(0.7071067812, 0, 0.7071067812), z_dir=(-0.7071067812, 0, 0.7071067812))):
        with BuildLine():
            ThreePointArc((0, -1), (1, 0), (0, 1))
            Line((0, 1), (0, -1))
        make_face()
    revolve(axis=Axis((-31.1369051993, 0.7084596083, 7), (0, 1, 0)), mode=Mode.SUBTRACT)


with BuildPart() as f17_2:
    add(f17_1.part)

    # F22_t21: cut F22_tool22
    add(f22_tool22.part, mode=Mode.SUBTRACT)

    # F22_s27 → F22_t28 (revolve, cut)
    with BuildSketch(Plane.XZ.offset(31.2915403917)):
        with BuildLine():
            ThreePointArc((-32.1369051993, 7), (-31.8440119805, 6.2928932188), (-31.1369051993, 6))
            Line((-31.1369051993, 6), (-31.1369051993, 5.98))
            Line((-31.1369051993, 5.98), (-32.1569051993, 5.98))
            Line((-32.1569051993, 5.98), (-32.1569051993, 7))
            Line((-32.1569051993, 7), (-32.1369051993, 7))
        make_face()
    revolve(axis=Axis((-32.1369051993, -31.2915403917, 5), (1, 0, 0)), revolution_arc=F22_T28_ANGLE, mode=Mode.SUBTRACT)

    # F22_s29 → F22_t30 (revolve, cut)
    with BuildSketch(Plane.YZ.offset(-20.1369051993)):
        with BuildLine():
            ThreePointArc((1.7084596083, 7), (1.4155663894, 6.2928932188), (0.7084596083, 6))
            Line((0.7084596083, 6), (0.7084596083, 5.98))
            Line((0.7084596083, 5.98), (1.7284596083, 5.98))
            Line((1.7284596083, 5.98), (1.7284596083, 7))
            Line((1.7284596083, 7), (1.7084596083, 7))
        make_face()
    revolve(axis=Axis((-20.1369051993, 1.7084596083, 5), (0, 1, 0)), revolution_arc=F22_T30_ANGLE, mode=Mode.SUBTRACT)

    # F22_s31 → F22_t32 (revolve, cut)
    with BuildSketch(Plane.XZ.offset(31.2915403917)):
        with BuildLine():
            ThreePointArc((-32.1369051993, 0), (-31.8440119805, 0.7071067812), (-31.1369051993, 1))
            Line((-31.1369051993, 1), (-31.1369051993, 1.02))
            Line((-31.1369051993, 1.02), (-32.1569051993, 1.02))
            Line((-32.1569051993, 1.02), (-32.1569051993, 0))
            Line((-32.1569051993, 0), (-32.1369051993, 0))
        make_face()
    revolve(axis=Axis((-32.1369051993, -31.2915403917, 2), (-1, 0, 0)), revolution_arc=F22_T32_ANGLE, mode=Mode.SUBTRACT)

    # F22_s33 → F22_t34 (revolve, cut)
    with BuildSketch(Plane.YZ.offset(-20.1369051993)):
        with BuildLine():
            ThreePointArc((1.7084596083, 0), (1.4155663894, 0.7071067812), (0.7084596083, 1))
            Line((0.7084596083, 1), (0.7084596083, 1.02))
            Line((0.7084596083, 1.02), (1.7284596083, 1.02))
            Line((1.7284596083, 1.02), (1.7284596083, 0))
            Line((1.7284596083, 0), (1.7084596083, 0))
        make_face()
    revolve(axis=Axis((-20.1369051993, 1.7084596083, 2), (0, -1, 0)), revolution_arc=F22_T34_ANGLE, mode=Mode.SUBTRACT)

    # F22_s36 → F22_t35 (cut)
    with BuildSketch(Plane.XZ.offset(1.2915403917)):
        with BuildLine():
            ThreePointArc((-31.1369051993, 1), (-30.4297984181, 0.7071067812), (-30.1369051993, 0))
            Line((-30.1369051993, 0), (-30.1169051993, 0))
            Line((-30.1169051993, 0), (-30.1169051993, 1.02))
            Line((-30.1169051993, 1.02), (-31.1369051993, 1.02))
            Line((-31.1369051993, 1.02), (-31.1369051993, 1))
        make_face()
        with BuildLine():
            ThreePointArc((-31.1369051993, 6), (-30.4297984181, 6.2928932188), (-30.1369051993, 7))
            Line((-30.1369051993, 7), (-30.1169051993, 7))
            Line((-30.1169051993, 7), (-30.1169051993, 5.98))
            Line((-30.1169051993, 5.98), (-31.1369051993, 5.98))
            Line((-31.1369051993, 5.98), (-31.1369051993, 6))
        make_face()
    extrude(amount=F22_T35_DEPTH, mode=Mode.SUBTRACT)

    # F22_s38 → F22_t37 (cut)
    with BuildSketch(Plane.YZ.offset(-29.1369051993)):
        with BuildLine():
            ThreePointArc((-0.2915403917, 0), (0.0013528271, 0.7071067812), (0.7084596083, 1))
            Line((0.7084596083, 1), (0.7084596083, 1.02))
            Line((0.7084596083, 1.02), (-0.3115403917, 1.02))
            Line((-0.3115403917, 1.02), (-0.3115403917, 0))
            Line((-0.3115403917, 0), (-0.2915403917, 0))
        make_face()
        with BuildLine():
            ThreePointArc((-0.2915403917, 7), (0.0013528271, 6.2928932188), (0.7084596083, 6))
            Line((0.7084596083, 6), (0.7084596083, 5.98))
            Line((0.7084596083, 5.98), (-0.3115403917, 5.98))
            Line((-0.3115403917, 5.98), (-0.3115403917, 7))
            Line((-0.3115403917, 7), (-0.2915403917, 7))
        make_face()
        with BuildLine():
            ThreePointArc((-12.2915403917, 1), (-12.9986471729, 0.7071067812), (-13.2915403917, 0))
            Line((-13.2915403917, 0), (-13.3115403917, 0))
            Line((-13.3115403917, 0), (-13.3115403917, 1.02))
            Line((-13.3115403917, 1.02), (-12.2915403917, 1.02))
            Line((-12.2915403917, 1.02), (-12.2915403917, 1))
        make_face()
        with BuildLine():
            ThreePointArc((-12.2915403917, 6), (-12.9986471729, 6.2928932188), (-13.2915403917, 7))
            Line((-13.2915403917, 7), (-13.3115403917, 7))
            Line((-13.3115403917, 7), (-13.3115403917, 5.98))
            Line((-13.3115403917, 5.98), (-12.2915403917, 5.98))
            Line((-12.2915403917, 5.98), (-12.2915403917, 6))
        make_face()
        with BuildLine():
            ThreePointArc((-12.2915403917, 1), (-11.5844336106, 0.7071067812), (-11.2915403917, 0))
            Line((-11.2915403917, 0), (-11.2715403917, 0))
            Line((-11.2715403917, 0), (-11.2715403917, 1.02))
            Line((-11.2715403917, 1.02), (-12.2915403917, 1.02))
            Line((-12.2915403917, 1.02), (-12.2915403917, 1))
        make_face()
        with BuildLine():
            ThreePointArc((-12.2915403917, 6), (-11.5844336106, 6.2928932188), (-11.2915403917, 7))
            Line((-11.2915403917, 7), (-11.2715403917, 7))
            Line((-11.2715403917, 7), (-11.2715403917, 5.98))
            Line((-11.2715403917, 5.98), (-12.2915403917, 5.98))
            Line((-12.2915403917, 5.98), (-12.2915403917, 6))
        make_face()
    extrude(amount=F22_T37_DEPTH, mode=Mode.SUBTRACT)

    # F22_s40 → F22_t39 (cut)
    with BuildSketch(Plane.XZ.offset(14.2915403917)):
        with BuildLine():
            ThreePointArc((-31.1369051993, 1), (-30.4297984181, 0.7071067812), (-30.1369051993, 0))
            Line((-30.1369051993, 0), (-30.1169051993, 0))
            Line((-30.1169051993, 0), (-30.1169051993, 1.02))
            Line((-30.1169051993, 1.02), (-31.1369051993, 1.02))
            Line((-31.1369051993, 1.02), (-31.1369051993, 1))
        make_face()
        with BuildLine():
            ThreePointArc((-31.1369051993, 6), (-30.4297984181, 6.2928932188), (-30.1369051993, 7))
            Line((-30.1369051993, 7), (-30.1169051993, 7))
            Line((-30.1169051993, 7), (-30.1169051993, 5.98))
            Line((-30.1169051993, 5.98), (-31.1369051993, 5.98))
            Line((-31.1369051993, 5.98), (-31.1369051993, 6))
        make_face()
    extrude(amount=F22_T39_DEPTH, mode=Mode.SUBTRACT)

    # F22_s41 → F22_t42 (revolve, cut)
    with BuildSketch(Plane.YZ.offset(-20.1369051993)):
        with BuildLine():
            ThreePointArc((-11.2915403917, 7), (-11.5844336106, 6.2928932188), (-12.2915403917, 6))
            Line((-12.2915403917, 6), (-12.2915403917, 5.98))
            Line((-12.2915403917, 5.98), (-11.2715403917, 5.98))
            Line((-11.2715403917, 5.98), (-11.2715403917, 7))
            Line((-11.2715403917, 7), (-11.2915403917, 7))
        make_face()
    revolve(axis=Axis((-20.1369051993, -11.2915403917, 5), (0, 1, 0)), revolution_arc=F22_T42_ANGLE, mode=Mode.SUBTRACT)

    # F22_s43 → F22_t44 (revolve, cut)
    with BuildSketch(Plane.XZ.offset(10.2915403917)):
        with BuildLine():
            ThreePointArc((-31.1369051993, 6), (-30.4297984181, 6.2928932188), (-30.1369051993, 7))
            Line((-30.1369051993, 7), (-30.1169051993, 7))
            Line((-30.1169051993, 7), (-30.1169051993, 5.98))
            Line((-30.1169051993, 5.98), (-31.1369051993, 5.98))
            Line((-31.1369051993, 5.98), (-31.1369051993, 6))
        make_face()
    revolve(axis=Axis((-29.1369051993, -10.2915403917, 6), (0, 0, 1)), revolution_arc=F22_T44_ANGLE, mode=Mode.SUBTRACT)

    # F22_s45 → F22_t46 (revolve, cut)
    with BuildSketch(Plane.YZ.offset(-20.1369051993)):
        with BuildLine():
            ThreePointArc((-11.2915403917, 0), (-11.5844336106, 0.7071067812), (-12.2915403917, 1))
            Line((-12.2915403917, 1), (-12.2915403917, 1.02))
            Line((-12.2915403917, 1.02), (-11.2715403917, 1.02))
            Line((-11.2715403917, 1.02), (-11.2715403917, 0))
            Line((-11.2715403917, 0), (-11.2915403917, 0))
        make_face()
    revolve(axis=Axis((-20.1369051993, -11.2915403917, 2), (0, -1, 0)), revolution_arc=F22_T46_ANGLE, mode=Mode.SUBTRACT)

    # F22_s47 → F22_t48 (revolve, cut)
    with BuildSketch(Plane.XZ.offset(10.2915403917)):
        with BuildLine():
            ThreePointArc((-31.1369051993, 1), (-30.4297984181, 0.7071067812), (-30.1369051993, 0))
            Line((-30.1369051993, 0), (-30.1169051993, 0))
            Line((-30.1169051993, 0), (-30.1169051993, 1.02))
            Line((-30.1169051993, 1.02), (-31.1369051993, 1.02))
            Line((-31.1369051993, 1.02), (-31.1369051993, 1))
        make_face()
    revolve(axis=Axis((-29.1369051993, -10.2915403917, 1), (0, 0, 1)), revolution_arc=F22_T48_ANGLE, mode=Mode.SUBTRACT)

    # F22_s49 → F22_t50 (revolve, cut)
    with BuildSketch(Plane.YZ.offset(-29.1369051993)):
        with BuildLine():
            ThreePointArc((-12.2915403917, 6), (-12.9986471729, 6.2928932188), (-13.2915403917, 7))
            Line((-13.2915403917, 7), (-13.3115403917, 7))
            Line((-13.3115403917, 7), (-13.3115403917, 5.98))
            Line((-13.3115403917, 5.98), (-12.2915403917, 5.98))
            Line((-12.2915403917, 5.98), (-12.2915403917, 6))
        make_face()
    revolve(axis=Axis((-29.1369051993, -14.2915403917, 6), (0, 0, 1)), revolution_arc=F22_T50_ANGLE, mode=Mode.SUBTRACT)

    # F22_s51 → F22_t52 (revolve, cut)
    with BuildSketch(Plane.YZ.offset(-20.1369051993)):
        with BuildLine():
            ThreePointArc((-13.2915403917, 7), (-12.9986471729, 6.2928932188), (-12.2915403917, 6))
            Line((-12.2915403917, 6), (-12.2915403917, 5.98))
            Line((-12.2915403917, 5.98), (-13.3115403917, 5.98))
            Line((-13.3115403917, 5.98), (-13.3115403917, 7))
            Line((-13.3115403917, 7), (-13.2915403917, 7))
        make_face()
    revolve(axis=Axis((-20.1369051993, -13.2915403917, 5), (0, 1, 0)), revolution_arc=F22_T52_ANGLE, mode=Mode.SUBTRACT)

    # F22_s53 → F22_t54 (revolve, cut)
    with BuildSketch(Plane.XZ.offset(31.2915403917)):
        with BuildLine():
            ThreePointArc((-30.1369051993, 7), (-30.4297984181, 6.2928932188), (-31.1369051993, 6))
            Line((-31.1369051993, 6), (-31.1369051993, 5.98))
            Line((-31.1369051993, 5.98), (-30.1169051993, 5.98))
            Line((-30.1169051993, 5.98), (-30.1169051993, 7))
            Line((-30.1169051993, 7), (-30.1369051993, 7))
        make_face()
    revolve(axis=Axis((-30.1369051993, -31.2915403917, 5), (1, 0, 0)), revolution_arc=F22_T54_ANGLE, mode=Mode.SUBTRACT)

    # F22_s55 → F22_t56 (revolve, cut)
    with BuildSketch(Plane.YZ.offset(-29.1369051993)):
        with BuildLine():
            ThreePointArc((-12.2915403917, 1), (-12.9986471729, 0.7071067812), (-13.2915403917, 0))
            Line((-13.2915403917, 0), (-13.3115403917, 0))
            Line((-13.3115403917, 0), (-13.3115403917, 1.02))
            Line((-13.3115403917, 1.02), (-12.2915403917, 1.02))
            Line((-12.2915403917, 1.02), (-12.2915403917, 1))
        make_face()
    revolve(axis=Axis((-29.1369051993, -14.2915403917, 1), (0, 0, 1)), revolution_arc=F22_T56_ANGLE, mode=Mode.SUBTRACT)

    # F22_s57 → F22_t58 (revolve, cut)
    with BuildSketch(Plane.YZ.offset(-20.1369051993)):
        with BuildLine():
            ThreePointArc((-13.2915403917, 0), (-12.9986471729, 0.7071067812), (-12.2915403917, 1))
            Line((-12.2915403917, 1), (-12.2915403917, 1.02))
            Line((-12.2915403917, 1.02), (-13.3115403917, 1.02))
            Line((-13.3115403917, 1.02), (-13.3115403917, 0))
            Line((-13.3115403917, 0), (-13.2915403917, 0))
        make_face()
    revolve(axis=Axis((-20.1369051993, -13.2915403917, 2), (0, -1, 0)), revolution_arc=F22_T58_ANGLE, mode=Mode.SUBTRACT)

    # F22_s59 → F22_t60 (revolve, cut)
    with BuildSketch(Plane.XZ.offset(31.2915403917)):
        with BuildLine():
            ThreePointArc((-30.1369051993, 0), (-30.4297984181, 0.7071067812), (-31.1369051993, 1))
            Line((-31.1369051993, 1), (-31.1369051993, 1.02))
            Line((-31.1369051993, 1.02), (-30.1169051993, 1.02))
            Line((-30.1169051993, 1.02), (-30.1169051993, 0))
            Line((-30.1169051993, 0), (-30.1369051993, 0))
        make_face()
    revolve(axis=Axis((-30.1369051993, -31.2915403917, 2), (-1, 0, 0)), revolution_arc=F22_T60_ANGLE, mode=Mode.SUBTRACT)

    # F22_s61 → F22_t62 (revolve, cut)
    with BuildSketch(Plane.YZ.offset(-29.1369051993)):
        with BuildLine():
            ThreePointArc((0.7084596083, 6), (0.0013528271, 6.2928932188), (-0.2915403917, 7))
            Line((-0.2915403917, 7), (-0.3115403917, 7))
            Line((-0.3115403917, 7), (-0.3115403917, 5.98))
            Line((-0.3115403917, 5.98), (0.7084596083, 5.98))
            Line((0.7084596083, 5.98), (0.7084596083, 6))
        make_face()
    revolve(axis=Axis((-29.1369051993, -1.2915403917, 6), (0, 0, 1)), revolution_arc=F22_T62_ANGLE, mode=Mode.SUBTRACT)

    # F22_s63 → F22_t64 (revolve, cut)
    with BuildSketch(Plane.YZ.offset(-20.1369051993)):
        with BuildLine():
            ThreePointArc((-0.2915403917, 7), (0.0013528271, 6.2928932188), (0.7084596083, 6))
            Line((0.7084596083, 6), (0.7084596083, 5.98))
            Line((0.7084596083, 5.98), (-0.3115403917, 5.98))
            Line((-0.3115403917, 5.98), (-0.3115403917, 7))
            Line((-0.3115403917, 7), (-0.2915403917, 7))
        make_face()
    revolve(axis=Axis((-20.1369051993, -0.2915403917, 5), (0, 1, 0)), revolution_arc=F22_T64_ANGLE, mode=Mode.SUBTRACT)

    # F22_s65 → F22_t66 (revolve, cut)
    with BuildSketch(Plane.YZ.offset(-29.1369051993)):
        with BuildLine():
            ThreePointArc((-0.2915403917, 0), (0.0013528271, 0.7071067812), (0.7084596083, 1))
            Line((0.7084596083, 1), (0.7084596083, 1.02))
            Line((0.7084596083, 1.02), (-0.3115403917, 1.02))
            Line((-0.3115403917, 1.02), (-0.3115403917, 0))
            Line((-0.3115403917, 0), (-0.2915403917, 0))
        make_face()
    revolve(axis=Axis((-29.1369051993, -1.2915403917, 1), (0, 0, 1)), revolution_arc=F22_T66_ANGLE, mode=Mode.SUBTRACT)

    # F22_s67 → F22_t68 (revolve, cut)
    with BuildSketch(Plane.YZ.offset(-20.1369051993)):
        with BuildLine():
            ThreePointArc((-0.2915403917, 0), (0.0013528271, 0.7071067812), (0.7084596083, 1))
            Line((0.7084596083, 1), (0.7084596083, 1.02))
            Line((0.7084596083, 1.02), (-0.3115403917, 1.02))
            Line((-0.3115403917, 1.02), (-0.3115403917, 0))
            Line((-0.3115403917, 0), (-0.2915403917, 0))
        make_face()
    revolve(axis=Axis((-20.1369051993, -0.2915403917, 2), (0, -1, 0)), revolution_arc=F22_T68_ANGLE, mode=Mode.SUBTRACT)


solid = f19_1.part
